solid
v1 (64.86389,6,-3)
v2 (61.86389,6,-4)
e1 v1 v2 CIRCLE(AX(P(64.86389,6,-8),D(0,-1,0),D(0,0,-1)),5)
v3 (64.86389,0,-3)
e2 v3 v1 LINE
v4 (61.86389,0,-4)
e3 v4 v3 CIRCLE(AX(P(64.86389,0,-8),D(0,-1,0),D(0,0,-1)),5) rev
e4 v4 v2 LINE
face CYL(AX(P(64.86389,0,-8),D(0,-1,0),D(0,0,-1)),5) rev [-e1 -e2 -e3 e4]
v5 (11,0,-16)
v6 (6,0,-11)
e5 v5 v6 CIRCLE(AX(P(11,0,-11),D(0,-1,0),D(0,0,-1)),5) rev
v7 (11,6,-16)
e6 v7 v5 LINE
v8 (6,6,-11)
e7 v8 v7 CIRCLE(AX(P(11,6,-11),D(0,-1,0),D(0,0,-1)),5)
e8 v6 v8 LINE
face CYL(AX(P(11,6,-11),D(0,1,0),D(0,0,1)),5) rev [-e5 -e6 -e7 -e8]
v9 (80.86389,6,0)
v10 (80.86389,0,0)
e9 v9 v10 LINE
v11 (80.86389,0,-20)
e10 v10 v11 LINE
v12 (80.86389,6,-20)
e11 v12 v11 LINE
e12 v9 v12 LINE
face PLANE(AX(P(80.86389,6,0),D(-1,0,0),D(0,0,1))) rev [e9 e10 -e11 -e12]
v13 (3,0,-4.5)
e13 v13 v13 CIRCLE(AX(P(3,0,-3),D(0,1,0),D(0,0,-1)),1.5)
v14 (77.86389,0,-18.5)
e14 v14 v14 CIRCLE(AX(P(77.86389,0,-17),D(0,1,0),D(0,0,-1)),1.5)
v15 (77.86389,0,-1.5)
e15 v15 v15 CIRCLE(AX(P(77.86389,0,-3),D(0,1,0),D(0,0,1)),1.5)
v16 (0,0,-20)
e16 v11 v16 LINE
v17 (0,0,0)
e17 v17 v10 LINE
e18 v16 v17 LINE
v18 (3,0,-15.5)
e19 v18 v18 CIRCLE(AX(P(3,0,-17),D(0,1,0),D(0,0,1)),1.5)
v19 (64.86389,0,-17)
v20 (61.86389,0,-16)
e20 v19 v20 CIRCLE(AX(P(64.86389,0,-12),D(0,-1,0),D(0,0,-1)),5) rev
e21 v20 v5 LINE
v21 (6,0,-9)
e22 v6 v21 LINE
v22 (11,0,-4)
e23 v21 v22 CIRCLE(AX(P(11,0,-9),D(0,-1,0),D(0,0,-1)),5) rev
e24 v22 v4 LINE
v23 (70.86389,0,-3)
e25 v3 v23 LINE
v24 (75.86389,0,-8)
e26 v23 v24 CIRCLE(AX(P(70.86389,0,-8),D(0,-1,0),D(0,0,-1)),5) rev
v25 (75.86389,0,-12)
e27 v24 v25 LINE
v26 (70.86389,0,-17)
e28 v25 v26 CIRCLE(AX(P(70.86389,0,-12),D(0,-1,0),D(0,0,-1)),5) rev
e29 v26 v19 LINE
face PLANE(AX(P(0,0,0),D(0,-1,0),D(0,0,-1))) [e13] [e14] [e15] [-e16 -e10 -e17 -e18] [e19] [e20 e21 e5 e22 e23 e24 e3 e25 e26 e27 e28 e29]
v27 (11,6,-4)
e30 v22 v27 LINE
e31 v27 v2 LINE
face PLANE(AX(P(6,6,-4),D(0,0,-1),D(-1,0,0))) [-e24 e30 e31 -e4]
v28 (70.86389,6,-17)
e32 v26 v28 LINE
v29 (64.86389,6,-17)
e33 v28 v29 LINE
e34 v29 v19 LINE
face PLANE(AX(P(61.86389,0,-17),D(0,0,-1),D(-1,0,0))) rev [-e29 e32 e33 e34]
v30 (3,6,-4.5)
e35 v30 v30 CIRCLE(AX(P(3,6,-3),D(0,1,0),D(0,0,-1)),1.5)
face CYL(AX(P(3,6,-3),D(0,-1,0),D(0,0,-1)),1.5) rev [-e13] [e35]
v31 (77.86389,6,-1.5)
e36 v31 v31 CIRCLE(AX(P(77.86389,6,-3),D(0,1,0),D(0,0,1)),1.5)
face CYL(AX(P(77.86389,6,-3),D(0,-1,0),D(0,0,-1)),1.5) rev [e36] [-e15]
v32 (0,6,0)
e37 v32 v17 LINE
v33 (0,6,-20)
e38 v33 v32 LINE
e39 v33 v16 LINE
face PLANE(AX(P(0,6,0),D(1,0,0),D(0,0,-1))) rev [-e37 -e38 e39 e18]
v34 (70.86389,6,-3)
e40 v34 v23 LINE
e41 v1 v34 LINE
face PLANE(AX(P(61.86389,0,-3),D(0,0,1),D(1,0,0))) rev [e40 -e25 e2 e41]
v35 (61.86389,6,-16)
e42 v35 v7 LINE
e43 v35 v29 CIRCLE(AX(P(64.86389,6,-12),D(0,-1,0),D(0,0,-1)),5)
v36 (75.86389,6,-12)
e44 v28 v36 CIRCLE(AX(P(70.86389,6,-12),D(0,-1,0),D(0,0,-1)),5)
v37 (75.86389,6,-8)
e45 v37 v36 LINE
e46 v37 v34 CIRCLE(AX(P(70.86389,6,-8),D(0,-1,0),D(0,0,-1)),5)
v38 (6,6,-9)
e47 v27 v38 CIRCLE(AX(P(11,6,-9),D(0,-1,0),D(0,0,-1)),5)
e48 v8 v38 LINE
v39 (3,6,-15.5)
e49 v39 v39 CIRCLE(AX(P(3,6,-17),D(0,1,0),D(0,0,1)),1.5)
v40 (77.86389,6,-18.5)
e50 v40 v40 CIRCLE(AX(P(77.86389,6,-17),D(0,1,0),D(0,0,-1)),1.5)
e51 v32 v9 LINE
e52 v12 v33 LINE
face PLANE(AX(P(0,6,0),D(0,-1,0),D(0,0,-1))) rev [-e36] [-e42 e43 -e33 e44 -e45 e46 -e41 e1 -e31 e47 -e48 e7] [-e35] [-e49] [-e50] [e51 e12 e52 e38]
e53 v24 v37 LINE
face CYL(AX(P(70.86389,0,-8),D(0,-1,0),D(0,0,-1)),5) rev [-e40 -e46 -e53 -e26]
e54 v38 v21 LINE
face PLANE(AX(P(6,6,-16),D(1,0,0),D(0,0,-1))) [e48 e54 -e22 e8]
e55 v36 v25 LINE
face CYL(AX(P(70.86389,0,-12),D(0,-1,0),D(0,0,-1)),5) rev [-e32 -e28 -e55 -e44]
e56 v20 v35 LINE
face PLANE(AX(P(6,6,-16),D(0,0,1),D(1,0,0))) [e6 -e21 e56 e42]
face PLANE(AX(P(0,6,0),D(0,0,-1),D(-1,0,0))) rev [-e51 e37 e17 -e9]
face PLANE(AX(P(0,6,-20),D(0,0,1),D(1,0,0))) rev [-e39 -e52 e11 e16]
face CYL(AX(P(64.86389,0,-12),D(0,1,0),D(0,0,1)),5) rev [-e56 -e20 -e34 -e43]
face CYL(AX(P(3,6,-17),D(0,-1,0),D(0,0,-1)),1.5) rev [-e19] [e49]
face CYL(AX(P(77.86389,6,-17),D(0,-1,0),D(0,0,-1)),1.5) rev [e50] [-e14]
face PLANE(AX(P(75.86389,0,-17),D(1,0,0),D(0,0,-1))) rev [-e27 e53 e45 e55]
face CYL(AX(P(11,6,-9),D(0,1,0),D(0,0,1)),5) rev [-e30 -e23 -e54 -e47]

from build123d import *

# Parameters (mm, degrees)
SKETCH1_W           = 80.863890266
SKETCH1_H           = 20
SKETCH1_R           = 1.5
SKETCH1_W_2         = 68.863890266
SKETCH1_H_2         = 12
BOSS_EXTRUDE1_DEPTH = 6
CUT_EXTRUDE1_DEPTH  = 84.516278347
FILLET1_R           = 5


with BuildPart() as part:
    # Sketch1 → Boss-Extrude1 (new body)
    with BuildSketch(Plane(origin=(0, 0, 0), x_dir=(1, 0, 0), z_dir=(0, 1, 0))):
        with Locations((40.431945133, 10)):
            Rectangle(SKETCH1_W, SKETCH1_H)
        with Locations(Location((3, 17, 0), (0, 0, 270))):
            Circle(SKETCH1_R, mode=Mode.SUBTRACT)
        with Locations(Location((3, 3, 0), (0, 0, 90))):
            Circle(SKETCH1_R, mode=Mode.SUBTRACT)
        with Locations(Location((77.863890266, 3, 0), (0, 0, 270))):
            Circle(SKETCH1_R, mode=Mode.SUBTRACT)
        with Locations(Location((77.863890266, 17, 0), (0, 0, 90))):
            Circle(SKETCH1_R, mode=Mode.SUBTRACT)
        with Locations((40.431945133, 10)):
            Rectangle(SKETCH1_W_2, SKETCH1_H_2, mode=Mode.SUBTRACT)
    extrude(amount=BOSS_EXTRUDE1_DEPTH)

    # Sketch2 → Cut-Extrude1 (cut, through all)
    with BuildSketch(Plane(origin=(0, 6, 0), x_dir=(1, 0, 0), z_dir=(0, 1, 0))):
        Polygon((61.863890266, 17), (61.863890266, 16), (74.863890266, 16), (74.863890266, 4), (61.863890266, 4), (61.863890266, 3), (75.863890266, 3), (75.863890266, 17), align=None)
    extrude(amount=-CUT_EXTRUDE1_DEPTH, mode=Mode.SUBTRACT)

    # Fillet1
    # the kernel refuses this fillet: 5 mm, written as the material it adds along each edge
    with BuildSketch(Plane(origin=(75.863890266, 6, -17), x_dir=(0, 0, 1), z_dir=(0, -1, 0)), Plane(origin=(75.863890266, 6, -3), x_dir=(-1, 0, 0), z_dir=(0, -1, 0)), Plane(origin=(6, 0, -16), x_dir=(0, 0, 1), z_dir=(0, 1, 0))) as fillet1_piece_1:
        with BuildLine():
            CenterArc((FILLET1_R, FILLET1_R), FILLET1_R, 180, 90)
            Line((0, FILLET1_R), (-FILLET1_R * 0.02, FILLET1_R))
            Line((-FILLET1_R * 0.02, FILLET1_R), (-FILLET1_R * 0.02, -FILLET1_R * 0.02))
            Line((-FILLET1_R * 0.02, -FILLET1_R * 0.02), (FILLET1_R, -FILLET1_R * 0.02))
            Line((FILLET1_R, -FILLET1_R * 0.02), (FILLET1_R, 0))
        make_face()
    extrude(amount=6)
    with BuildSketch(Plane(origin=(61.863890266, 6, -17), x_dir=(1, 0, 0), z_dir=(0, -1, 0))) as fillet1_piece_2:
        with BuildLine():
            CenterArc((3, 5), FILLET1_R, 233.130102354, 36.869897646)
            Line((0, 1), (-0.06, 0.92))
            ThreePointArc((-0.06, 0.92), (-0.1, 0.5), (-0.1, 0))
            Line((-0.1, 0), (0, -0.1))
            Line((0, -0.1), (3, -0.1))
            Line((3, -0.1), (3, 0))
        make_face()
    extrude(amount=6)
    with BuildSketch(Plane(origin=(61.863890266, 6, -3), x_dir=(0, 0, -1), z_dir=(0, -1, 0))) as fillet1_piece_3:
        with BuildLine():
            CenterArc((5, 3), FILLET1_R, 180, 36.869897646)
            Line((0, 3), (-0.1, 3))
            Line((-0.1, 3), (-0.1, 0))
            Line((-0.1, 0), (0, -0.1))
            ThreePointArc((0, -0.1), (0.5, -0.1), (0.92, -0.06))
            Line((0.92, -0.06), (1, 0))
        make_face()
    extrude(amount=6)
    with BuildSketch(Plane(origin=(6, 0, -4), x_dir=(0, 0, -1), z_dir=(0, 1, 0))) as fillet1_piece_4:
        with BuildLine():
            CenterArc((FILLET1_R, -FILLET1_R), FILLET1_R, 90, 90)
            Line((0, -FILLET1_R), (-FILLET1_R * 0.02, -FILLET1_R))
            Line((-FILLET1_R * 0.02, -FILLET1_R), (-FILLET1_R * 0.02, FILLET1_R * 0.02))
            Line((-FILLET1_R * 0.02, FILLET1_R * 0.02), (FILLET1_R, FILLET1_R * 0.02))
            Line((FILLET1_R, FILLET1_R * 0.02), (FILLET1_R, 0))
        make_face()
    extrude(amount=6)


solid = part.part
